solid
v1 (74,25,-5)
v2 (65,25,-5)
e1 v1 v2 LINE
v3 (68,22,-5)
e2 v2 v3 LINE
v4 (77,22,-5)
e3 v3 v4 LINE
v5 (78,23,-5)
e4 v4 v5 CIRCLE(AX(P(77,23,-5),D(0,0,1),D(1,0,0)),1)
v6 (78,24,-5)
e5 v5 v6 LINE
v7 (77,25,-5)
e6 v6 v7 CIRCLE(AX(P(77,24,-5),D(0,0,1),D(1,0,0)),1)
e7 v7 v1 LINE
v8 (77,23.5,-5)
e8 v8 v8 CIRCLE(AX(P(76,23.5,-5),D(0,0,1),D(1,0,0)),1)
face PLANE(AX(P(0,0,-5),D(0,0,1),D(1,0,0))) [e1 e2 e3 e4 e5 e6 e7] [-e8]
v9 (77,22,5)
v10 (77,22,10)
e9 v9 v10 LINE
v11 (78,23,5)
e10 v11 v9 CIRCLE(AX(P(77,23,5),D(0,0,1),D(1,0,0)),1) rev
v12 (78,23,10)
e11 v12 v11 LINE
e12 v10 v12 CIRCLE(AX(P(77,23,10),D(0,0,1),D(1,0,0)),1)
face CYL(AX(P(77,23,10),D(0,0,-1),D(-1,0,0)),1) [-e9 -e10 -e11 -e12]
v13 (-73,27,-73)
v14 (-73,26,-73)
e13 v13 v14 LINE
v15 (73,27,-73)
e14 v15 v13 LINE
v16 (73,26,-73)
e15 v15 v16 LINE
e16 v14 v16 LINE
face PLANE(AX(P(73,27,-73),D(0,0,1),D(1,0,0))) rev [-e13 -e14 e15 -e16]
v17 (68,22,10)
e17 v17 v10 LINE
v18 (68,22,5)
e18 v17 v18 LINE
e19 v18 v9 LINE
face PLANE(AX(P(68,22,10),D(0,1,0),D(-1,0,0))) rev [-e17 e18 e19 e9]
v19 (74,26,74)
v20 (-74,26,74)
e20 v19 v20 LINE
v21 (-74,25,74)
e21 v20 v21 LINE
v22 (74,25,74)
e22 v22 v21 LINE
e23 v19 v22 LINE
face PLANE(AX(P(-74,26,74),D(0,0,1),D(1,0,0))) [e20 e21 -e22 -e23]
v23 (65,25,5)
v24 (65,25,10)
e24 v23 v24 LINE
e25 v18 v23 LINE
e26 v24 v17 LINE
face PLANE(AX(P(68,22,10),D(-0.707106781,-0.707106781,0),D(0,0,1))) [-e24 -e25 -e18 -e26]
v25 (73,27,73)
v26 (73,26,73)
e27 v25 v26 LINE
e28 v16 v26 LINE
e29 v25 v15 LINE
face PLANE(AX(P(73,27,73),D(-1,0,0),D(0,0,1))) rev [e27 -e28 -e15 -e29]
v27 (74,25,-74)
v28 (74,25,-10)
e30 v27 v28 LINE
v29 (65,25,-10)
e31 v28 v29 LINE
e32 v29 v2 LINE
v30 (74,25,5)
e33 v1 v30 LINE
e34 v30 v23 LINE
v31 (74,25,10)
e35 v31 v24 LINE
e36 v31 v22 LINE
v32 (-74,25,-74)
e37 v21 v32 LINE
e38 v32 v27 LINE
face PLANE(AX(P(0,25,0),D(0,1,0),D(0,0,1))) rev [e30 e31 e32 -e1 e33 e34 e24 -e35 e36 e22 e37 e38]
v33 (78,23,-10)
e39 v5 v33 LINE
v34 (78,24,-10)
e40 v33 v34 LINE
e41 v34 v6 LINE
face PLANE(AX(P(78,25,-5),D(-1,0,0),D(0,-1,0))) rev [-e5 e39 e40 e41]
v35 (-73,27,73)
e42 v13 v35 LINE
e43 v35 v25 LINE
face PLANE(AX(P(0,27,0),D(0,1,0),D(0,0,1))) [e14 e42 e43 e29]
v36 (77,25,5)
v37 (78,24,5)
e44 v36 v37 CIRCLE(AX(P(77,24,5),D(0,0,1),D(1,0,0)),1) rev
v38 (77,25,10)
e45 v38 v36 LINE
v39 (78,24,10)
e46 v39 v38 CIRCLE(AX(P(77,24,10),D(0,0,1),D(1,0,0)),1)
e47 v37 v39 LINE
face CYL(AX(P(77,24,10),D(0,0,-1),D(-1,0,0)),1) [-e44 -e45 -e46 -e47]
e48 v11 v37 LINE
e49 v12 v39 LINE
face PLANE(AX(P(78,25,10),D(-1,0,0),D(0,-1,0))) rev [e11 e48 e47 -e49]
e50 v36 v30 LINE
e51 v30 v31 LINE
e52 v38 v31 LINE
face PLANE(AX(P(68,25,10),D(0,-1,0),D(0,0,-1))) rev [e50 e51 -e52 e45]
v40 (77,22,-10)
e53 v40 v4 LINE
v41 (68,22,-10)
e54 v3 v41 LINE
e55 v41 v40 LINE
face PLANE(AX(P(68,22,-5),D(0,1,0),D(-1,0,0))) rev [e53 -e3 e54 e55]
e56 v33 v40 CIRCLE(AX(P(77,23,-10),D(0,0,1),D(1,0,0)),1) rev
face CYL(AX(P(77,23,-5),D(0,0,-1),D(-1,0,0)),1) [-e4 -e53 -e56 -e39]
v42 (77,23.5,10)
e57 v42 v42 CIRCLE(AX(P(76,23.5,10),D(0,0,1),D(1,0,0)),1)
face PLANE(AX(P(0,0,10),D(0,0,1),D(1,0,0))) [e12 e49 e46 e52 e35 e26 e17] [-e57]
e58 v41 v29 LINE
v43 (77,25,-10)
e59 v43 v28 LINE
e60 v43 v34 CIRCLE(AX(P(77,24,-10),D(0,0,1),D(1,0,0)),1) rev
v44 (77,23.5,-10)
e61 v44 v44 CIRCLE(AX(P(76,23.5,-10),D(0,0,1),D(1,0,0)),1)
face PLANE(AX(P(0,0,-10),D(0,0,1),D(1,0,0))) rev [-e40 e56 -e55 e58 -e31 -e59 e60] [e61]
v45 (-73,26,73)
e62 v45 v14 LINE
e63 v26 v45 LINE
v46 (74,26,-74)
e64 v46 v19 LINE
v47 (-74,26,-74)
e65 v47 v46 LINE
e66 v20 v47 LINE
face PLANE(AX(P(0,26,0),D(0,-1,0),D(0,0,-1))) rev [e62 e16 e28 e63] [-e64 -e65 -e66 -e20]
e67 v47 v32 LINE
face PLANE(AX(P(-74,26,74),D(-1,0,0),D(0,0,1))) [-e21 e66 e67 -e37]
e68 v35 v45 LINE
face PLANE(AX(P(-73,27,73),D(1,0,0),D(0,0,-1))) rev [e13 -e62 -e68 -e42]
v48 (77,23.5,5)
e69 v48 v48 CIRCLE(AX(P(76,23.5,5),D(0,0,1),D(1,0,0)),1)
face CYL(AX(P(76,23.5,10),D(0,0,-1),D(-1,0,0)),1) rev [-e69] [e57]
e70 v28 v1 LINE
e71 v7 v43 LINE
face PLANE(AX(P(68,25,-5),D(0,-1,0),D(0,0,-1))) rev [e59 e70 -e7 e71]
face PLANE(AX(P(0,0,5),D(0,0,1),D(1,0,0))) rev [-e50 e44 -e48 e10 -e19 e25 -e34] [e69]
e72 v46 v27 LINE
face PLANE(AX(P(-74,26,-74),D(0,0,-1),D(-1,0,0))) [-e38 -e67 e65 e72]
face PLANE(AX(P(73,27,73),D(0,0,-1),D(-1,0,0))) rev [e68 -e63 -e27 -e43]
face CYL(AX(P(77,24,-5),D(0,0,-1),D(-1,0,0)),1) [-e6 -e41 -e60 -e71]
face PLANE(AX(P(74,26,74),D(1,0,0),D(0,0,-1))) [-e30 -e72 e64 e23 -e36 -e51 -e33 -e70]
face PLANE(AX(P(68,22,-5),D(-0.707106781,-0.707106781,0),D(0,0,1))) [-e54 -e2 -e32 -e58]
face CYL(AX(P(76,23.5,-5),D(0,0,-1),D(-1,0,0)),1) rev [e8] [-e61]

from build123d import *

# Parameters (mm, degrees)
SKETCH1_R           = 10
SKETCH1_R_2         = 7.5
BOSS_EXTRUDE1_DEPTH = 25
THREAD1_PITCH       = 0.3175
SKETCH4_W           = 146
SKETCH4_H           = 146
BOSS_EXTRUDE2_DEPTH = 2
SKETCH5_W           = 148
SKETCH5_H           = 148
BOSS_EXTRUDE3_DEPTH = 1
BOSS_EXTRUDE4_START = 7.5
SKETCH6_W           = 10
SKETCH6_H           = 3
SKETCH6_R           = 1
BOSS_EXTRUDE4_DEPTH = 2.5
BOSS_EXTRUDE5_START = -7.5
SKETCH6_2_W         = 10
SKETCH6_2_H         = 3
SKETCH6_2_R         = 1
BOSS_EXTRUDE5_DEPTH = 2.5
SKETCH9_R           = 18.995637602
CUT_EXTRUDE1_DEPTH  = 111.385687501
CHAMFER1_SIZE       = 3
FILLET1_R           = 1


with BuildPart() as part:
    # Sketch1 → Boss-Extrude1 (new body)
    with BuildSketch(Plane(origin=(0, 0, 0), x_dir=(1, 0, 0), z_dir=(0, 1, 0))):
        with Locations(Location((0, 0, 0), (0, 0, 270))):
            Circle(SKETCH1_R)
        with Locations(Location((0, 0, 0), (0, 0, 270))):
            Circle(SKETCH1_R_2, mode=Mode.SUBTRACT)
    extrude(amount=BOSS_EXTRUDE1_DEPTH)

    # Thread1: the profile of Thread Profile1 profile screwed along a right-hand helix of 18.897638 turns, 6 arcs to a turn; built about Z, then put on its axis
    thread1_z = Axis((0, 0, 0), (0, 0, 1))
    thread1_corners = [(10.0003, 0, -0.000173205), (10.0003, 0, 0.277985704), (9.828148085, 0, 0.17859375), (9.828148085, 0, 0.09921875)]
    with BuildLine(mode=Mode.PRIVATE) as thread1_profile:
        Line(thread1_corners[0], thread1_corners[1])
        Line(thread1_corners[1], thread1_corners[2])
        Line(thread1_corners[2], thread1_corners[3])
        Line(thread1_corners[3], thread1_corners[0])
    thread1_cap = Face(thread1_profile.wire())
    thread1_turn_angles = [0, 30, 60, 90, 120, 150, 180, 210, 240, 270, 300, 330, 360]
    thread1_turn_weights = [1, 0.8660254037844387, 1, 0.8660254037844387, 1, 0.8660254037844387, 1, 0.8660254037844387, 1, 0.8660254037844387, 1, 0.8660254037844387, 1]
    thread1_turn_rails = [Edge.make_bspline([Vector(p[0], p[1], 0).rotate(thread1_z, thread1_turn_angles[k]) / thread1_turn_weights[k] + Vector(0, 0, p[2] + THREAD1_PITCH * thread1_turn_angles[k] / 360) for k in range(13)], [0, 0, 0, 1, 1, 2, 2, 3, 3, 4, 4, 5, 5, 6, 6, 6], 2, thread1_turn_weights) for p in thread1_corners]
    thread1_turn_sides = [Face.make_surface_from_curves(thread1_turn_rails[p[0]], thread1_turn_rails[p[1]]) for p in [(0, 1), (1, 2), (2, 3), (3, 0)]]
    thread1_last_angles = [6480, 6510, 6540, 6570, 6600, 6630, 6660, 6690, 6720, 6750, 6780, 6791.57480315, 6803.149606299]
    thread1_last_weights = [1, 0.8660254037844387, 1, 0.8660254037844387, 1, 0.8660254037844387, 1, 0.8660254037844387, 1, 0.8660254037844387, 1, 0.9796635825089068, 1]
    thread1_last_rails = [Edge.make_bspline([Vector(p[0], p[1], 0).rotate(thread1_z, thread1_last_angles[k]) / thread1_last_weights[k] + Vector(0, 0, p[2] + THREAD1_PITCH * thread1_last_angles[k] / 360) for k in range(13)], [0, 0, 0, 1, 1, 2, 2, 3, 3, 4, 4, 5, 5, 6, 6, 6], 2, thread1_last_weights) for p in thread1_corners]
    thread1_last_sides = [Face.make_surface_from_curves(thread1_last_rails[p[0]], thread1_last_rails[p[1]]) for p in [(0, 1), (1, 2), (2, 3), (3, 0)]]
    thread1 = Plane(origin=(0, -0.5, 0), x_dir=(1, 0, 0), z_dir=(0, 1, 0)) * Solid(Shell([*[p.moved(Location((0, 0, THREAD1_PITCH * i))) for i in range(18) for p in thread1_turn_sides], *thread1_last_sides, thread1_cap, thread1_cap.rotate(thread1_z, 6803.149606299).moved(Location((0, 0, THREAD1_PITCH * 6803.149606299 / 360)))]))
    add(thread1, mode=Mode.SUBTRACT)

    # Sketch4 → Boss-Extrude2 (add)
    with BuildSketch(Plane(origin=(0, 25, 0), x_dir=(1, 0, 0), z_dir=(0, 1, 0))):
        Rectangle(SKETCH4_W, SKETCH4_H)
    extrude(amount=BOSS_EXTRUDE2_DEPTH)

    # Sketch5 → Boss-Extrude3 (add)
    with BuildSketch(Plane.XZ.offset(-25)):
        Rectangle(SKETCH5_W, SKETCH5_H)
    extrude(amount=-BOSS_EXTRUDE3_DEPTH)

    # Sketch6 → Boss-Extrude4 (add, symmetric)
    with BuildSketch(Plane.XY.offset(BOSS_EXTRUDE4_START)):
        with Locations((73, 23.5)):
            Rectangle(SKETCH6_W, SKETCH6_H)
        with Locations((76, 23.5)):
            Circle(SKETCH6_R, mode=Mode.SUBTRACT)
    extrude(amount=BOSS_EXTRUDE4_DEPTH, both=True)

    # Sketch6<2> → Boss-Extrude5 (add, symmetric)
    with BuildSketch(Plane.XY.offset(BOSS_EXTRUDE5_START)):
        with Locations((73, 23.5)):
            Rectangle(SKETCH6_2_W, SKETCH6_2_H)
        with Locations((76, 23.5)):
            Circle(SKETCH6_2_R, mode=Mode.SUBTRACT)
    extrude(amount=BOSS_EXTRUDE5_DEPTH, both=True)

    # Sketch9 → Cut-Extrude1 (cut, through all)
    with BuildSketch(Plane.XZ.offset(-25)):
        Circle(SKETCH9_R)
    extrude(amount=CUT_EXTRUDE1_DEPTH, mode=Mode.SUBTRACT)

    # Chamfer1
    chamfer1_edges = [part.edges().sort_by_distance(p)[0] for p in [
        (68, 25, -7.5),
        (68, 25, 7.5),
    ]]
    chamfer(chamfer1_edges, length=CHAMFER1_SIZE - 0.0001)  # a hair under: the kernel refuses the full size

    # Fillet1
    fillet1_edges = [part.edges().sort_by_distance(p)[0] for p in [
        (78, 22, 7.5),
        (78, 25, 7.5),
        (78, 22, -7.5),
        (78, 25, -7.5),
    ]]
    fillet(fillet1_edges, radius=FILLET1_R)


solid = part.part
